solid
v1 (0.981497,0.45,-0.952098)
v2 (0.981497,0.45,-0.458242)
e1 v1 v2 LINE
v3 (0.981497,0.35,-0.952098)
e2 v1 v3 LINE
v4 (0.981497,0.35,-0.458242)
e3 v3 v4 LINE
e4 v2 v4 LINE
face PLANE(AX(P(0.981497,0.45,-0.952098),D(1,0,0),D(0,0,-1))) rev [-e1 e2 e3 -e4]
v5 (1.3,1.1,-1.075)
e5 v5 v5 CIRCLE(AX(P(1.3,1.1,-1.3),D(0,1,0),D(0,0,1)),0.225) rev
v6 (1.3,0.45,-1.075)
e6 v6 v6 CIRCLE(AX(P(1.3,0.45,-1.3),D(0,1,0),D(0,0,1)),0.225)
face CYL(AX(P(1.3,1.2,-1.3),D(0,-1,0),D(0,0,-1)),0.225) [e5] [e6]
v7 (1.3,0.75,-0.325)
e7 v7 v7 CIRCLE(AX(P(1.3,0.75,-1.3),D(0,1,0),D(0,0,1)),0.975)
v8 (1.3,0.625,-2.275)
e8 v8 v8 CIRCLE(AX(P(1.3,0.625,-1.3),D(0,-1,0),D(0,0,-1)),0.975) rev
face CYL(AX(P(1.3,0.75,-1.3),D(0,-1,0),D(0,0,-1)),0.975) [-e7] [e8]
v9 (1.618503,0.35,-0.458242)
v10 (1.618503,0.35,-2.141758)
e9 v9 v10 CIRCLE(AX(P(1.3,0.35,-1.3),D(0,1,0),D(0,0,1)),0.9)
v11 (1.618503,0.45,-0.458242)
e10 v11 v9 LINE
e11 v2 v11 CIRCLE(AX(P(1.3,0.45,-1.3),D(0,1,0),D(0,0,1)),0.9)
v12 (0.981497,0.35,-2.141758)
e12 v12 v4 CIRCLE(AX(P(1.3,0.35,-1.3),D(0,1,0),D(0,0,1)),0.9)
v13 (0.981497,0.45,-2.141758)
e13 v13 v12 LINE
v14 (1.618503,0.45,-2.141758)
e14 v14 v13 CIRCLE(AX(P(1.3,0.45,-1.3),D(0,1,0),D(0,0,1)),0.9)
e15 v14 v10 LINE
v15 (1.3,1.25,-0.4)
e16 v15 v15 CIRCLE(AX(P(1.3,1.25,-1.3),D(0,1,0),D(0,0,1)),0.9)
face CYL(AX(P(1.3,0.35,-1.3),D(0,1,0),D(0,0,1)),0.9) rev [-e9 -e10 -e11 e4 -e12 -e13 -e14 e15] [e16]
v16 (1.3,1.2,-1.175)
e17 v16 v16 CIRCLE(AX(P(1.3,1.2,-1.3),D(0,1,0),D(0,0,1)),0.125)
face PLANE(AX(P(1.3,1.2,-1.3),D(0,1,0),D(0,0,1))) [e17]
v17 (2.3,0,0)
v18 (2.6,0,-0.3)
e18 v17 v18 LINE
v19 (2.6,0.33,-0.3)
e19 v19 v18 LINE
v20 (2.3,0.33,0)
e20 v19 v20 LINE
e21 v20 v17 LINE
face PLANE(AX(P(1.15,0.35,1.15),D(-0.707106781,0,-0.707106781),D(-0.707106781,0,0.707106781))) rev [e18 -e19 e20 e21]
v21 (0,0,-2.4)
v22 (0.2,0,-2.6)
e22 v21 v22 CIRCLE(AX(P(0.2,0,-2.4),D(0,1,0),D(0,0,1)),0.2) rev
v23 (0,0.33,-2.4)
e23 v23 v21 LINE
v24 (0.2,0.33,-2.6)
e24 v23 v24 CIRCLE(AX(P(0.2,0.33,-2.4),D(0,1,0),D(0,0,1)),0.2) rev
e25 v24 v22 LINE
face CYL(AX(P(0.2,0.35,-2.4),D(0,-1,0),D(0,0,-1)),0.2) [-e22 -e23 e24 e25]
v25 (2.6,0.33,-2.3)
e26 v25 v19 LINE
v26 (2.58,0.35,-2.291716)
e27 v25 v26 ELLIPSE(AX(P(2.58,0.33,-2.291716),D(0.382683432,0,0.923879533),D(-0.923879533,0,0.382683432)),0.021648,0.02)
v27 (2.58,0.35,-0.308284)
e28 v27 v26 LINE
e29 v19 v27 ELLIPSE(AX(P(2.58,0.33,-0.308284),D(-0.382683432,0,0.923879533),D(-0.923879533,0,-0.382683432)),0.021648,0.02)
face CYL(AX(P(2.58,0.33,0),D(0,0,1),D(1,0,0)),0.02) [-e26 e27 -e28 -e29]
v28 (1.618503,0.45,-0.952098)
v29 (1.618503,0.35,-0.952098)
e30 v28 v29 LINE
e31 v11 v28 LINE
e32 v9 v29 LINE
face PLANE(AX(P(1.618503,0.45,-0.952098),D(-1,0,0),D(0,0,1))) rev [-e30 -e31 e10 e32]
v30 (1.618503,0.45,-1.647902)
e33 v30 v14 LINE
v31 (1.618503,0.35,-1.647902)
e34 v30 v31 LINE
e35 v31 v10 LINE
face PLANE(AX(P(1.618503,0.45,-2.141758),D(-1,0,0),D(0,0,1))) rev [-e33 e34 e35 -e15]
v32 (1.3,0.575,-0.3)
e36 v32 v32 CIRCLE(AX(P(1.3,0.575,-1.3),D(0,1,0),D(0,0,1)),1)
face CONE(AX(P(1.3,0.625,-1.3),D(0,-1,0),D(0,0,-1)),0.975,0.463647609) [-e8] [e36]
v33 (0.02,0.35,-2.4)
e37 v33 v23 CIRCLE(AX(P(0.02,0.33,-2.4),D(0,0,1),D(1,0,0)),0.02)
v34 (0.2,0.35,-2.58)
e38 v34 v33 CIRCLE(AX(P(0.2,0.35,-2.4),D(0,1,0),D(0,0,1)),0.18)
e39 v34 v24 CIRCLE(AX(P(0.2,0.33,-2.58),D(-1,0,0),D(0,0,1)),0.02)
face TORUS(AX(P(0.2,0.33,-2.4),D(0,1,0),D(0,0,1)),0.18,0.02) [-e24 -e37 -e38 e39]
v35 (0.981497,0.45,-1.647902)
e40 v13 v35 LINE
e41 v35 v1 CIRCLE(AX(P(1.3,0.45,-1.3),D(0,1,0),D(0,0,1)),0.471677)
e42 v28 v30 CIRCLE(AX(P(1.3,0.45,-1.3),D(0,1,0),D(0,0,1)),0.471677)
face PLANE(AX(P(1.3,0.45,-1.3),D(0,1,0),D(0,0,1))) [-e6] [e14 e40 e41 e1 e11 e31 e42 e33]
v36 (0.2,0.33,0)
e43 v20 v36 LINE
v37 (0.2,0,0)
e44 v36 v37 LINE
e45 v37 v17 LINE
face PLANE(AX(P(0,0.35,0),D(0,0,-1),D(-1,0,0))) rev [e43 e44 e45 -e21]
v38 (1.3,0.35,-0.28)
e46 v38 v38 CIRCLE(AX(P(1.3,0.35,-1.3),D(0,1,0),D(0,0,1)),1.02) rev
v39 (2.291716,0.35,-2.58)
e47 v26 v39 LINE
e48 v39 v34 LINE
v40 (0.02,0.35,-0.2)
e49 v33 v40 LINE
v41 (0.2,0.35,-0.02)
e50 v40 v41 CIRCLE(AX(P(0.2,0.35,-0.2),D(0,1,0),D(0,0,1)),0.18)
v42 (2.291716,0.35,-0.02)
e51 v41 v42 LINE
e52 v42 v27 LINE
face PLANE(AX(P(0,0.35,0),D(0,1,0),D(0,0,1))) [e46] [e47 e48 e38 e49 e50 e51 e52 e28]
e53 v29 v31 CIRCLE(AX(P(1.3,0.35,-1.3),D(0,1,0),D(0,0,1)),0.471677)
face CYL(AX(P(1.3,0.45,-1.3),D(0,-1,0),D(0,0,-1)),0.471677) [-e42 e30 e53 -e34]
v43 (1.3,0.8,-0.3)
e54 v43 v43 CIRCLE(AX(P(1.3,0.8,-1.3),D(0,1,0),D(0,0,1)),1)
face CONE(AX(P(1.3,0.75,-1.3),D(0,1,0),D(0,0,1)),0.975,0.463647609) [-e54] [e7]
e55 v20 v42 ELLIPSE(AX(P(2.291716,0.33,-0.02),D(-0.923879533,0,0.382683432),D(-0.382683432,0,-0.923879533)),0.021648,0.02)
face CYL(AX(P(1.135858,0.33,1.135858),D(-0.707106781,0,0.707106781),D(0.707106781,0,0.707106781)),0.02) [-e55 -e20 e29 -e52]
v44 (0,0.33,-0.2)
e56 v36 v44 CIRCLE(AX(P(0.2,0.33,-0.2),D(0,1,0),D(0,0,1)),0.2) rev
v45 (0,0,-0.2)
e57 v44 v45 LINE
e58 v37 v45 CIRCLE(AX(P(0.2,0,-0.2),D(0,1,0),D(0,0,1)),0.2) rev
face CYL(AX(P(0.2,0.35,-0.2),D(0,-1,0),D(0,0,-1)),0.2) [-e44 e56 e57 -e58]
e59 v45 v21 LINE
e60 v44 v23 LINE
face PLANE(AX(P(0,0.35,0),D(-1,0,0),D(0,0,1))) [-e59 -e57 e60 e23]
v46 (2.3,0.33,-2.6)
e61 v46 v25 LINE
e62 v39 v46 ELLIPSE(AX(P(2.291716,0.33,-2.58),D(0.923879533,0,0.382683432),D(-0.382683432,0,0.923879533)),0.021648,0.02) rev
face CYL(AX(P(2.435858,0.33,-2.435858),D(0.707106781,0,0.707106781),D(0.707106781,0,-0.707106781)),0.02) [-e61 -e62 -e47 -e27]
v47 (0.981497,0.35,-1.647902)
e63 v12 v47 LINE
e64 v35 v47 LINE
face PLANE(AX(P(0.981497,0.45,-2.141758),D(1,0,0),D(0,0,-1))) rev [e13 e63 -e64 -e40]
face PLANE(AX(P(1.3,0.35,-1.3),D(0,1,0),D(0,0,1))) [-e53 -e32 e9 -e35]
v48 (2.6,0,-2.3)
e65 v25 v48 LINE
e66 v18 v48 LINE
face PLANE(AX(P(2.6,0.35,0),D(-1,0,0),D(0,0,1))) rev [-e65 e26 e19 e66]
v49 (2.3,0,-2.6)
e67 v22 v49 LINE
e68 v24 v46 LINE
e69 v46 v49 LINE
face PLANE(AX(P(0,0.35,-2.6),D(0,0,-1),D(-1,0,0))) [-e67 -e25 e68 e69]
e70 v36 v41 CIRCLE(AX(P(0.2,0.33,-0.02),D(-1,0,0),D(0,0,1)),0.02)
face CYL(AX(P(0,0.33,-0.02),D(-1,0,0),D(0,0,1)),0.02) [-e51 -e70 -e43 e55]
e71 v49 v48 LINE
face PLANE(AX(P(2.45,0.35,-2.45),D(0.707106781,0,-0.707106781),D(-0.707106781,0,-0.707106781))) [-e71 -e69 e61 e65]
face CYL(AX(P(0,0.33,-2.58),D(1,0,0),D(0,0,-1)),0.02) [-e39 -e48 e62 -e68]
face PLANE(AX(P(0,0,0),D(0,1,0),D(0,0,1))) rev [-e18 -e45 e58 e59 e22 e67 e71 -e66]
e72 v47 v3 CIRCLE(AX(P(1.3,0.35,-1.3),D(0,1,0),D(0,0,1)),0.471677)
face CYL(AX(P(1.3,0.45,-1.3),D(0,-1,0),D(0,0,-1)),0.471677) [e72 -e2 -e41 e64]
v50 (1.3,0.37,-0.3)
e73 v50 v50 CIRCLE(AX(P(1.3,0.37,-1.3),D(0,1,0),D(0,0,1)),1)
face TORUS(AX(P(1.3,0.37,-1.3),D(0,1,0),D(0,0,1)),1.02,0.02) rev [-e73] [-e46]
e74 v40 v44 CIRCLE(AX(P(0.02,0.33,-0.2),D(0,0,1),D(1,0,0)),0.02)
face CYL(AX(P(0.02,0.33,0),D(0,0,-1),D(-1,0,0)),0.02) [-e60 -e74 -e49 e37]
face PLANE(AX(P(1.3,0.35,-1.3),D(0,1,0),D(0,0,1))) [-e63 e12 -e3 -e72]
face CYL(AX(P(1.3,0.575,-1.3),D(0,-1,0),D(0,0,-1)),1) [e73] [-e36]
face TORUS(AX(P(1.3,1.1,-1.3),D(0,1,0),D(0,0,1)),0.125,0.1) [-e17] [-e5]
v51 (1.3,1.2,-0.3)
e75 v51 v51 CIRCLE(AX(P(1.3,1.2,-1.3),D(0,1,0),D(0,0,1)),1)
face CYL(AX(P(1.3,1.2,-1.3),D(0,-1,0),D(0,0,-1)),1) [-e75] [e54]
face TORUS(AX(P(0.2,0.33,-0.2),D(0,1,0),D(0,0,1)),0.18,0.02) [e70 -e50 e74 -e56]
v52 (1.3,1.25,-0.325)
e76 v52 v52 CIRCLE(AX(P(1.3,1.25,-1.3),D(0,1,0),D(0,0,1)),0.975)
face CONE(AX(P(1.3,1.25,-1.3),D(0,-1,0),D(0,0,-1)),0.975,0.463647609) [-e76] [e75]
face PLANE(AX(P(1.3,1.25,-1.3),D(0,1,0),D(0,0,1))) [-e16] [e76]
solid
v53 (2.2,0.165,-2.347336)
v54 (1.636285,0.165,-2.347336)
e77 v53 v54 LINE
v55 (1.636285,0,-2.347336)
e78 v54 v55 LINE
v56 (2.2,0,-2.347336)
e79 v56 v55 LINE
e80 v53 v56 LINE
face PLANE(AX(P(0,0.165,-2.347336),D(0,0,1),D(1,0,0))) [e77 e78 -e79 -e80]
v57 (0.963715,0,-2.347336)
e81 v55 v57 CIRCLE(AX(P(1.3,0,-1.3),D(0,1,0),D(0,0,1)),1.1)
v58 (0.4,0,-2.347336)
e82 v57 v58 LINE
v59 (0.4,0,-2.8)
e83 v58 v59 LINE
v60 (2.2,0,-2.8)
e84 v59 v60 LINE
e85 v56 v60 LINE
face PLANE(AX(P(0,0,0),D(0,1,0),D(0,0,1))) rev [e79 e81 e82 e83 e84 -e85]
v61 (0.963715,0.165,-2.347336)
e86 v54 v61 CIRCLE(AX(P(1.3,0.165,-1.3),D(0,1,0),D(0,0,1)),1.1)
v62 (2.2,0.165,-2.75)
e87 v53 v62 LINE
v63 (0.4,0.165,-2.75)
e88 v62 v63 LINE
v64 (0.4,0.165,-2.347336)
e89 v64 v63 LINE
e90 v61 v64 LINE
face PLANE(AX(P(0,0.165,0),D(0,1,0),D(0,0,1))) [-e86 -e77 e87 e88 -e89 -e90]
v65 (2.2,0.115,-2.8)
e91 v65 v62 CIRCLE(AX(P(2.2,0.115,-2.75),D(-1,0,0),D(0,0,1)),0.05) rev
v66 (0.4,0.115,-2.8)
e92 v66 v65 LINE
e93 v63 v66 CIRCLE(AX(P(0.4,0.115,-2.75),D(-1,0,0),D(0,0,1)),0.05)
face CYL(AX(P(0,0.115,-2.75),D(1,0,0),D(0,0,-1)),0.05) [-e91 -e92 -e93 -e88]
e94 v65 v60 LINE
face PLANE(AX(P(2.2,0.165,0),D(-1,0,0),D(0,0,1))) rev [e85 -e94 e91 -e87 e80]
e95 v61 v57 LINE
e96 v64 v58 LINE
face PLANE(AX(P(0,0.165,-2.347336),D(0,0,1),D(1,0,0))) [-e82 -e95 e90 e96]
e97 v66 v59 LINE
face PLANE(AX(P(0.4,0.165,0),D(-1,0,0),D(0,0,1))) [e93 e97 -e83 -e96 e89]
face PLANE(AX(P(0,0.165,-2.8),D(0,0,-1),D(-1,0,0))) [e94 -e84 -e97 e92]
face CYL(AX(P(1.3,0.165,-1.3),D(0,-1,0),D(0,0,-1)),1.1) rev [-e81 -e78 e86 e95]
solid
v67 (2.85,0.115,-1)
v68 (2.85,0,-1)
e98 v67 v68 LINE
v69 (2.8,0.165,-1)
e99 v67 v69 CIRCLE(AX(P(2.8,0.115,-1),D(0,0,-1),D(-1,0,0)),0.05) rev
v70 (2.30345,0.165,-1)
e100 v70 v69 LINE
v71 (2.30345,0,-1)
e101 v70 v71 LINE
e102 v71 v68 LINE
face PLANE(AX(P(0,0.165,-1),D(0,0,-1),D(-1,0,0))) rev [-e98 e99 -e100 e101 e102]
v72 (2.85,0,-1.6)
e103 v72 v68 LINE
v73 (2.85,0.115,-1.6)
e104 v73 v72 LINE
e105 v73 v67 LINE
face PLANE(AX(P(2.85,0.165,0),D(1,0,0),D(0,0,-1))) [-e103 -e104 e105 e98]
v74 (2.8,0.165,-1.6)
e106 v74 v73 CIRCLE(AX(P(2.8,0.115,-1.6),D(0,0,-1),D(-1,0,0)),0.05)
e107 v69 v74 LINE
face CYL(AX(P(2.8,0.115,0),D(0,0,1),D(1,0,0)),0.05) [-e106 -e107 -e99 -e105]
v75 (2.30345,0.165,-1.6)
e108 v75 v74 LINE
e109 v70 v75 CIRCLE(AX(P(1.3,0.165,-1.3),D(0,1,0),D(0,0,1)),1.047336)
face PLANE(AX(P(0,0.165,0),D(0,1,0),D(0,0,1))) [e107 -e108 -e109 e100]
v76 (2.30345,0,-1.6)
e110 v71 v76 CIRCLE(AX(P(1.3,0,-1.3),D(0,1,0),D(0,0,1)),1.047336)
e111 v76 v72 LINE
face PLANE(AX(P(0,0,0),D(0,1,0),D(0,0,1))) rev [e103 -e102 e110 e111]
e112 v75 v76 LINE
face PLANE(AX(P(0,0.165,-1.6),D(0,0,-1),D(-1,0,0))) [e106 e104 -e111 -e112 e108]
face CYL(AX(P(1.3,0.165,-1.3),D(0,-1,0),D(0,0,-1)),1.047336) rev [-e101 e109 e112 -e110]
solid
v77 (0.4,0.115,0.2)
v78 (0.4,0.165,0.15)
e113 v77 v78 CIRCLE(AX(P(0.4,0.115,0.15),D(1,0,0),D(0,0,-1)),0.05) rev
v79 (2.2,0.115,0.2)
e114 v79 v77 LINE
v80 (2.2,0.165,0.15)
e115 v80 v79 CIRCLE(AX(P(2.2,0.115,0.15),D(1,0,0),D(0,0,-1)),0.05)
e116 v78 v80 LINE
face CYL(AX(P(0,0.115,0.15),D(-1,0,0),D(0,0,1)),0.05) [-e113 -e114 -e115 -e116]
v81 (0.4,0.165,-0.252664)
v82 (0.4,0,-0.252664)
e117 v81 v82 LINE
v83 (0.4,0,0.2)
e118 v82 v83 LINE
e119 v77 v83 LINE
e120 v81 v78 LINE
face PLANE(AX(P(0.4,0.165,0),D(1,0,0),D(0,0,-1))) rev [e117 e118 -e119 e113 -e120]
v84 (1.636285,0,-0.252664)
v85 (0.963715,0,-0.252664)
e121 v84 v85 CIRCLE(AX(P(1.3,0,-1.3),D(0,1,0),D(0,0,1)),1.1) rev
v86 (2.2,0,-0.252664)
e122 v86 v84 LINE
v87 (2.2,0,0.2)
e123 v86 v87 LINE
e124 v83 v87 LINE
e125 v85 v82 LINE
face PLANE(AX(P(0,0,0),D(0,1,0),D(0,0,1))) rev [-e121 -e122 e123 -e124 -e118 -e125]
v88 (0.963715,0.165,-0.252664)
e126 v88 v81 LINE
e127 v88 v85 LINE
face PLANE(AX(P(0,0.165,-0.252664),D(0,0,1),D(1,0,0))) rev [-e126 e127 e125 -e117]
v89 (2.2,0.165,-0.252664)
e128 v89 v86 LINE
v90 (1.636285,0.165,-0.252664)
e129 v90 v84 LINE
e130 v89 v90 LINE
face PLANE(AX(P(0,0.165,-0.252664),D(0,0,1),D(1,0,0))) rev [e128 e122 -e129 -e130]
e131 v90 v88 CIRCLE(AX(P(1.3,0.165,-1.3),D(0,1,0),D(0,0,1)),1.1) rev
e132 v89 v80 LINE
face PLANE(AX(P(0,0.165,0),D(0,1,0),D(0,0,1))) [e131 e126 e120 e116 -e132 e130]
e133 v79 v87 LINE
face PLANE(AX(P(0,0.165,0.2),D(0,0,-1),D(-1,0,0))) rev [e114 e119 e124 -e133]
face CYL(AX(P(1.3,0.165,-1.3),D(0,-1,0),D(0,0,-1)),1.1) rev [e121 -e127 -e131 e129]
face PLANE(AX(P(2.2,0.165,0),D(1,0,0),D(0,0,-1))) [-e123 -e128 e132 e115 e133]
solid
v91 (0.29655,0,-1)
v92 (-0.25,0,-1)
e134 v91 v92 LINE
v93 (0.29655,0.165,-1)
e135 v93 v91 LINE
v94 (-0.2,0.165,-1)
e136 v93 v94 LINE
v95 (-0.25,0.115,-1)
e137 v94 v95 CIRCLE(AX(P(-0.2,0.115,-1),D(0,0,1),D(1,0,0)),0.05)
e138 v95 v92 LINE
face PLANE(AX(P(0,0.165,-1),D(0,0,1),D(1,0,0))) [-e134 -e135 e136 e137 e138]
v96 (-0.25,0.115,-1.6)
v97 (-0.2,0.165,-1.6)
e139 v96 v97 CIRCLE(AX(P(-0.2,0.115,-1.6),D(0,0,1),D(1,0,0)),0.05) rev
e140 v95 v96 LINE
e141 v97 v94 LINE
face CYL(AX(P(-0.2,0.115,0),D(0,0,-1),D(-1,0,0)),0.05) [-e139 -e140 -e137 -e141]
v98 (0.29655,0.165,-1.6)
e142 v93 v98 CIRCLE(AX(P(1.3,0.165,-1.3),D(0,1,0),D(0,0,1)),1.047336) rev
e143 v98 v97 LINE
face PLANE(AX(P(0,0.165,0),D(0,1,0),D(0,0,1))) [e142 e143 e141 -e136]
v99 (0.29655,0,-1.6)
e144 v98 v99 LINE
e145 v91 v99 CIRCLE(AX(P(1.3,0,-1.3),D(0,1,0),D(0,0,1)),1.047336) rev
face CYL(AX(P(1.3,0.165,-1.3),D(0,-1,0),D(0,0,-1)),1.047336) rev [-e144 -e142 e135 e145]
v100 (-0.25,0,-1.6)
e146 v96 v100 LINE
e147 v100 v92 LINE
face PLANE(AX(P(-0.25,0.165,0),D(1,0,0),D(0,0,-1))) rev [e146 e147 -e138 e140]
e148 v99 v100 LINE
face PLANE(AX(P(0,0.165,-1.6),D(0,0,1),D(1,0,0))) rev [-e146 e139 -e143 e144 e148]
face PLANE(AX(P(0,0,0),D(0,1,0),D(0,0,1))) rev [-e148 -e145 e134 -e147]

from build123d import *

# Parameters (mm, degrees)
SKETCH1_W           = 1.8
SKETCH1_H           = 0.2
SKETCH1_W_2         = 0.25
SKETCH1_H_2         = 0.6
BOSS_EXTRUDE1_DEPTH = 0.165
BOSS_EXTRUDE2_DEPTH = 0.35
SKETCH2_R           = 1
BOSS_EXTRUDE3_DEPTH = 0.225
SKETCH4_R           = 0.975
SKETCH5_R           = 0.975
SKETCH6_R           = 1
SKETCH7_R           = 1
BOSS_EXTRUDE4_DEPTH = 0.4
SKETCH8_R           = 0.975
SKETCH9_R           = 0.9
CUT_EXTRUDE1_DEPTH  = 0.9
SKETCH10_R          = 0.225
BOSS_EXTRUDE5_DEPTH = 0.85
BOSS_EXTRUDE6_DEPTH = 0.1
FILLET1_R           = 0.05
FILLET2_R           = 0.05
FILLET3_R           = 0.05
FILLET4_R           = 0.05
FILLET5_R           = 0.02
FILLET6_R           = 0.1


# Read off the part's stored shape, not the designer's step: Boss-Extrude2
with BuildPart() as part:
    # Sketch1 → Boss-Extrude1 (new body)
    with BuildSketch(Plane(origin=(0, 0, 0), x_dir=(1, 0, 0), z_dir=(0, 1, 0))):
        with Locations((1.3, -0.1)):
            Rectangle(SKETCH1_W, SKETCH1_H)
        with Locations((2.725, 1.3)):
            Rectangle(SKETCH1_W_2, SKETCH1_H_2)
        with Locations((1.3, 2.7)):
            Rectangle(SKETCH1_W, SKETCH1_H)
        with Locations((-0.125, 1.3)):
            Rectangle(SKETCH1_W_2, SKETCH1_H_2)
        with BuildLine():
            Line((2.303450249, 1), (2.6, 1))
            Line((2.6, 1), (2.6, 1.6))
            Line((2.6, 1.6), (2.303450249, 1.6))
            ThreePointArc((2.303450249, 1.6), (2.347335859, 1.3), (2.303450249, 1))
        make_face()
        with BuildLine():
            Line((2.2, 2.6), (0.4, 2.6))
            Line((0.4, 2.6), (0.4, 2.347335859))
            Line((0.4, 2.347335859), (0.963715005, 2.347335859))
            ThreePointArc((0.963715005, 2.347335859), (1.3, 2.4), (1.636284995, 2.347335859))
            Line((1.636284995, 2.347335859), (2.2, 2.347335859))
            Line((2.2, 2.347335859), (2.2, 2.6))
        make_face()
        with BuildLine():
            Line((0.4, 0.252664141), (0.4, 0))
            Line((0.4, 0), (2.2, 0))
            Line((2.2, 0), (2.2, 0.252664141))
            Line((2.2, 0.252664141), (1.636284995, 0.252664141))
            ThreePointArc((1.636284995, 0.252664141), (1.3, 0.2), (0.963715005, 0.252664141))
            Line((0.963715005, 0.252664141), (0.4, 0.252664141))
        make_face()
        with BuildLine():
            Line((0, 1.6), (0, 1))
            Line((0, 1), (0.296549751, 1))
            ThreePointArc((0.296549751, 1), (0.252664141, 1.3), (0.296549751, 1.6))
            Line((0.296549751, 1.6), (0, 1.6))
        make_face()
    extrude(amount=BOSS_EXTRUDE1_DEPTH)

    # Fillet1
    fillet1_edges = [part.edges().sort_by_distance(p)[0] for p in [
        (1.3, 0.165, -2.8),
    ]]
    fillet(fillet1_edges, radius=FILLET1_R)

    # Fillet2
    fillet2_edges = [part.edges().sort_by_distance(p)[0] for p in [
        (2.85, 0.165, -1.3),
    ]]
    fillet(fillet2_edges, radius=FILLET2_R)

    # Fillet3
    fillet3_edges = [part.edges().sort_by_distance(p)[0] for p in [
        (-0.25, 0.165, -1.3),
    ]]
    fillet(fillet3_edges, radius=FILLET3_R)

    # Fillet4
    fillet4_edges = [part.edges().sort_by_distance(p)[0] for p in [
        (1.3, 0.165, 0.2),
    ]]
    fillet(fillet4_edges, radius=FILLET4_R)


with BuildPart() as body_2:
    # Boss-Extrude2 outline → Boss-Extrude2 (new body)
    with BuildSketch(Plane(origin=(0, 0, 0), x_dir=(1, 0, 0), z_dir=(0, 1, 0))):
        with BuildLine():
            Line((0.2, 0), (2.3, 0))
            Line((2.3, 0), (2.6, 0.3))
            Line((2.6, 0.3), (2.6, 2.3))
            Line((2.6, 2.3), (2.3, 2.6))
            Line((2.3, 2.6), (0.2, 2.6))
            ThreePointArc((0.2, 2.6), (0.058578644, 2.541421356), (0, 2.4))
            Line((0, 2.4), (0, 0.2))
            ThreePointArc((0, 0.2), (0.058578644, 0.058578644), (0.2, 0))
        make_face()
    extrude(amount=BOSS_EXTRUDE2_DEPTH)

    # Sketch2 → Boss-Extrude3 (add)
    with BuildSketch(Plane(origin=(0, 0.35, 0), x_dir=(1, 0, 0), z_dir=(0, 1, 0))):
        with Locations(Location((1.3, 1.3, 0), (0, 0, 270))):
            Circle(SKETCH2_R)
    extrude(amount=BOSS_EXTRUDE3_DEPTH)

    # Sketch4 → section 1 of loft1
    with BuildSketch(Plane(origin=(0, 0.625, 0), x_dir=(1, 0, 0), z_dir=(0, 1, 0)), mode=Mode.PRIVATE) as loft1_s1:
        with Locations((1.3, 1.3)):
            Circle(SKETCH4_R)
    # loft up to a face of the part (loft1)
    loft([Face(Wire([body_2.edges().sort_by_distance((2.028968627, 0.575, -1.984547106))[0]])), loft1_s1.sketch])

    # Sketch5 → section 0 of loft2
    with BuildSketch(Plane(origin=(0, 0.75, 0), x_dir=(1, 0, 0), z_dir=(0, 1, 0)), mode=Mode.PRIVATE) as loft2_s0:
        with Locations((1.3, 1.3)):
            Circle(SKETCH5_R)
    # loft up to a face of the part (loft2)
    loft([loft2_s0.sketch, Face(Wire([body_2.edges().sort_by_distance((2.010744412, 0.625, -1.967433428))[0]]))])

    # Sketch6 → section 1 of loft3
    with BuildSketch(Plane(origin=(0, 0.8, 0), x_dir=(1, 0, 0), z_dir=(0, 1, 0)), mode=Mode.PRIVATE) as loft3_s1:
        with Locations((1.3, 1.3)):
            Circle(SKETCH6_R)
    # loft up to a face of the part (loft3)
    loft([Face(Wire([body_2.edges().sort_by_distance((0.632566572, 0.75, -2.010744412))[0]])), loft3_s1.sketch])

    # Sketch7 → Boss-Extrude4 (add)
    with BuildSketch(Plane(origin=(0, 0.8, 0), x_dir=(1, 0, 0), z_dir=(0, 1, 0))):
        with Locations(Location((1.3, 1.3, 0), (0, 0, 270))):
            Circle(SKETCH7_R)
    extrude(amount=BOSS_EXTRUDE4_DEPTH)

    # Sketch8 → section 1 of loft5
    with BuildSketch(Plane(origin=(0, 1.25, 0), x_dir=(1, 0, 0), z_dir=(0, 1, 0)), mode=Mode.PRIVATE) as loft5_s1:
        with Locations((1.3, 1.3)):
            Circle(SKETCH8_R)
    # loft up to a face of the part (loft5)
    loft([Face(Wire([body_2.edges().sort_by_distance((2.028968627, 1.2, -1.984547106))[0]])), loft5_s1.sketch])

    # Sketch9 → Cut-Extrude1 (cut)
    with BuildSketch(Plane(origin=(0, 1.25, 0), x_dir=(1, 0, 0), z_dir=(0, 1, 0))):
        with Locations(Location((1.3, 1.3, 0), (0, 0, 270))):
            Circle(SKETCH9_R)
    extrude(amount=-CUT_EXTRUDE1_DEPTH, mode=Mode.SUBTRACT)

    # Sketch10 → Boss-Extrude5 (add)
    with BuildSketch(Plane(origin=(0, 0.35, 0), x_dir=(1, 0, 0), z_dir=(0, 1, 0))):
        with Locations(Location((1.3, 1.3, 0), (0, 0, 270))):
            Circle(SKETCH10_R)
    extrude(amount=BOSS_EXTRUDE5_DEPTH)

    # Sketch11 → Boss-Extrude6 (add)
    with BuildSketch(Plane(origin=(0, 0.35, 0), x_dir=(1, 0, 0), z_dir=(0, 1, 0))):
        with BuildLine():
            Line((1.618502888, 0.952098493), (1.618502888, 0.458242368))
            ThreePointArc((1.618502888, 0.458242368), (1.3, 0.4), (0.981497112, 0.458242368))
            Line((0.981497112, 0.458242368), (0.981497112, 0.952098493))
            ThreePointArc((0.981497112, 0.952098493), (0.828322623, 1.3), (0.981497112, 1.647901507))
            Line((0.981497112, 1.647901507), (0.981497112, 2.141757632))
            ThreePointArc((0.981497112, 2.141757632), (1.3, 2.2), (1.618502888, 2.141757632))
            Line((1.618502888, 2.141757632), (1.618502888, 1.647901507))
            ThreePointArc((1.618502888, 1.647901507), (1.771677377, 1.3), (1.618502888, 0.952098493))
        make_face()
    extrude(amount=BOSS_EXTRUDE6_DEPTH)

    # Fillet5
    fillet5_edges = [body_2.edges().sort_by_distance(p)[0] for p in [
        (2.45, 0.35, -0.15),
        (2.6, 0.35, -1.3),
        (2.45, 0.35, -2.45),
        (1.25, 0.35, -2.6),
        (0.058578644, 0.35, -2.541421356),
        (1.3, 0.35, -2.3),
        (1.25, 0.35, 0),
        (0, 0.35, -1.3),
        (0.058578644, 0.35, -0.058578644),
    ]]
    fillet(fillet5_edges, radius=FILLET5_R)

    # Fillet6
    fillet6_edges = [body_2.edges().sort_by_distance(p)[0] for p in [
        (1.3, 1.2, -1.525),
    ]]
    fillet(fillet6_edges, radius=FILLET6_R)


solid = Compound([part.part, body_2.part])
